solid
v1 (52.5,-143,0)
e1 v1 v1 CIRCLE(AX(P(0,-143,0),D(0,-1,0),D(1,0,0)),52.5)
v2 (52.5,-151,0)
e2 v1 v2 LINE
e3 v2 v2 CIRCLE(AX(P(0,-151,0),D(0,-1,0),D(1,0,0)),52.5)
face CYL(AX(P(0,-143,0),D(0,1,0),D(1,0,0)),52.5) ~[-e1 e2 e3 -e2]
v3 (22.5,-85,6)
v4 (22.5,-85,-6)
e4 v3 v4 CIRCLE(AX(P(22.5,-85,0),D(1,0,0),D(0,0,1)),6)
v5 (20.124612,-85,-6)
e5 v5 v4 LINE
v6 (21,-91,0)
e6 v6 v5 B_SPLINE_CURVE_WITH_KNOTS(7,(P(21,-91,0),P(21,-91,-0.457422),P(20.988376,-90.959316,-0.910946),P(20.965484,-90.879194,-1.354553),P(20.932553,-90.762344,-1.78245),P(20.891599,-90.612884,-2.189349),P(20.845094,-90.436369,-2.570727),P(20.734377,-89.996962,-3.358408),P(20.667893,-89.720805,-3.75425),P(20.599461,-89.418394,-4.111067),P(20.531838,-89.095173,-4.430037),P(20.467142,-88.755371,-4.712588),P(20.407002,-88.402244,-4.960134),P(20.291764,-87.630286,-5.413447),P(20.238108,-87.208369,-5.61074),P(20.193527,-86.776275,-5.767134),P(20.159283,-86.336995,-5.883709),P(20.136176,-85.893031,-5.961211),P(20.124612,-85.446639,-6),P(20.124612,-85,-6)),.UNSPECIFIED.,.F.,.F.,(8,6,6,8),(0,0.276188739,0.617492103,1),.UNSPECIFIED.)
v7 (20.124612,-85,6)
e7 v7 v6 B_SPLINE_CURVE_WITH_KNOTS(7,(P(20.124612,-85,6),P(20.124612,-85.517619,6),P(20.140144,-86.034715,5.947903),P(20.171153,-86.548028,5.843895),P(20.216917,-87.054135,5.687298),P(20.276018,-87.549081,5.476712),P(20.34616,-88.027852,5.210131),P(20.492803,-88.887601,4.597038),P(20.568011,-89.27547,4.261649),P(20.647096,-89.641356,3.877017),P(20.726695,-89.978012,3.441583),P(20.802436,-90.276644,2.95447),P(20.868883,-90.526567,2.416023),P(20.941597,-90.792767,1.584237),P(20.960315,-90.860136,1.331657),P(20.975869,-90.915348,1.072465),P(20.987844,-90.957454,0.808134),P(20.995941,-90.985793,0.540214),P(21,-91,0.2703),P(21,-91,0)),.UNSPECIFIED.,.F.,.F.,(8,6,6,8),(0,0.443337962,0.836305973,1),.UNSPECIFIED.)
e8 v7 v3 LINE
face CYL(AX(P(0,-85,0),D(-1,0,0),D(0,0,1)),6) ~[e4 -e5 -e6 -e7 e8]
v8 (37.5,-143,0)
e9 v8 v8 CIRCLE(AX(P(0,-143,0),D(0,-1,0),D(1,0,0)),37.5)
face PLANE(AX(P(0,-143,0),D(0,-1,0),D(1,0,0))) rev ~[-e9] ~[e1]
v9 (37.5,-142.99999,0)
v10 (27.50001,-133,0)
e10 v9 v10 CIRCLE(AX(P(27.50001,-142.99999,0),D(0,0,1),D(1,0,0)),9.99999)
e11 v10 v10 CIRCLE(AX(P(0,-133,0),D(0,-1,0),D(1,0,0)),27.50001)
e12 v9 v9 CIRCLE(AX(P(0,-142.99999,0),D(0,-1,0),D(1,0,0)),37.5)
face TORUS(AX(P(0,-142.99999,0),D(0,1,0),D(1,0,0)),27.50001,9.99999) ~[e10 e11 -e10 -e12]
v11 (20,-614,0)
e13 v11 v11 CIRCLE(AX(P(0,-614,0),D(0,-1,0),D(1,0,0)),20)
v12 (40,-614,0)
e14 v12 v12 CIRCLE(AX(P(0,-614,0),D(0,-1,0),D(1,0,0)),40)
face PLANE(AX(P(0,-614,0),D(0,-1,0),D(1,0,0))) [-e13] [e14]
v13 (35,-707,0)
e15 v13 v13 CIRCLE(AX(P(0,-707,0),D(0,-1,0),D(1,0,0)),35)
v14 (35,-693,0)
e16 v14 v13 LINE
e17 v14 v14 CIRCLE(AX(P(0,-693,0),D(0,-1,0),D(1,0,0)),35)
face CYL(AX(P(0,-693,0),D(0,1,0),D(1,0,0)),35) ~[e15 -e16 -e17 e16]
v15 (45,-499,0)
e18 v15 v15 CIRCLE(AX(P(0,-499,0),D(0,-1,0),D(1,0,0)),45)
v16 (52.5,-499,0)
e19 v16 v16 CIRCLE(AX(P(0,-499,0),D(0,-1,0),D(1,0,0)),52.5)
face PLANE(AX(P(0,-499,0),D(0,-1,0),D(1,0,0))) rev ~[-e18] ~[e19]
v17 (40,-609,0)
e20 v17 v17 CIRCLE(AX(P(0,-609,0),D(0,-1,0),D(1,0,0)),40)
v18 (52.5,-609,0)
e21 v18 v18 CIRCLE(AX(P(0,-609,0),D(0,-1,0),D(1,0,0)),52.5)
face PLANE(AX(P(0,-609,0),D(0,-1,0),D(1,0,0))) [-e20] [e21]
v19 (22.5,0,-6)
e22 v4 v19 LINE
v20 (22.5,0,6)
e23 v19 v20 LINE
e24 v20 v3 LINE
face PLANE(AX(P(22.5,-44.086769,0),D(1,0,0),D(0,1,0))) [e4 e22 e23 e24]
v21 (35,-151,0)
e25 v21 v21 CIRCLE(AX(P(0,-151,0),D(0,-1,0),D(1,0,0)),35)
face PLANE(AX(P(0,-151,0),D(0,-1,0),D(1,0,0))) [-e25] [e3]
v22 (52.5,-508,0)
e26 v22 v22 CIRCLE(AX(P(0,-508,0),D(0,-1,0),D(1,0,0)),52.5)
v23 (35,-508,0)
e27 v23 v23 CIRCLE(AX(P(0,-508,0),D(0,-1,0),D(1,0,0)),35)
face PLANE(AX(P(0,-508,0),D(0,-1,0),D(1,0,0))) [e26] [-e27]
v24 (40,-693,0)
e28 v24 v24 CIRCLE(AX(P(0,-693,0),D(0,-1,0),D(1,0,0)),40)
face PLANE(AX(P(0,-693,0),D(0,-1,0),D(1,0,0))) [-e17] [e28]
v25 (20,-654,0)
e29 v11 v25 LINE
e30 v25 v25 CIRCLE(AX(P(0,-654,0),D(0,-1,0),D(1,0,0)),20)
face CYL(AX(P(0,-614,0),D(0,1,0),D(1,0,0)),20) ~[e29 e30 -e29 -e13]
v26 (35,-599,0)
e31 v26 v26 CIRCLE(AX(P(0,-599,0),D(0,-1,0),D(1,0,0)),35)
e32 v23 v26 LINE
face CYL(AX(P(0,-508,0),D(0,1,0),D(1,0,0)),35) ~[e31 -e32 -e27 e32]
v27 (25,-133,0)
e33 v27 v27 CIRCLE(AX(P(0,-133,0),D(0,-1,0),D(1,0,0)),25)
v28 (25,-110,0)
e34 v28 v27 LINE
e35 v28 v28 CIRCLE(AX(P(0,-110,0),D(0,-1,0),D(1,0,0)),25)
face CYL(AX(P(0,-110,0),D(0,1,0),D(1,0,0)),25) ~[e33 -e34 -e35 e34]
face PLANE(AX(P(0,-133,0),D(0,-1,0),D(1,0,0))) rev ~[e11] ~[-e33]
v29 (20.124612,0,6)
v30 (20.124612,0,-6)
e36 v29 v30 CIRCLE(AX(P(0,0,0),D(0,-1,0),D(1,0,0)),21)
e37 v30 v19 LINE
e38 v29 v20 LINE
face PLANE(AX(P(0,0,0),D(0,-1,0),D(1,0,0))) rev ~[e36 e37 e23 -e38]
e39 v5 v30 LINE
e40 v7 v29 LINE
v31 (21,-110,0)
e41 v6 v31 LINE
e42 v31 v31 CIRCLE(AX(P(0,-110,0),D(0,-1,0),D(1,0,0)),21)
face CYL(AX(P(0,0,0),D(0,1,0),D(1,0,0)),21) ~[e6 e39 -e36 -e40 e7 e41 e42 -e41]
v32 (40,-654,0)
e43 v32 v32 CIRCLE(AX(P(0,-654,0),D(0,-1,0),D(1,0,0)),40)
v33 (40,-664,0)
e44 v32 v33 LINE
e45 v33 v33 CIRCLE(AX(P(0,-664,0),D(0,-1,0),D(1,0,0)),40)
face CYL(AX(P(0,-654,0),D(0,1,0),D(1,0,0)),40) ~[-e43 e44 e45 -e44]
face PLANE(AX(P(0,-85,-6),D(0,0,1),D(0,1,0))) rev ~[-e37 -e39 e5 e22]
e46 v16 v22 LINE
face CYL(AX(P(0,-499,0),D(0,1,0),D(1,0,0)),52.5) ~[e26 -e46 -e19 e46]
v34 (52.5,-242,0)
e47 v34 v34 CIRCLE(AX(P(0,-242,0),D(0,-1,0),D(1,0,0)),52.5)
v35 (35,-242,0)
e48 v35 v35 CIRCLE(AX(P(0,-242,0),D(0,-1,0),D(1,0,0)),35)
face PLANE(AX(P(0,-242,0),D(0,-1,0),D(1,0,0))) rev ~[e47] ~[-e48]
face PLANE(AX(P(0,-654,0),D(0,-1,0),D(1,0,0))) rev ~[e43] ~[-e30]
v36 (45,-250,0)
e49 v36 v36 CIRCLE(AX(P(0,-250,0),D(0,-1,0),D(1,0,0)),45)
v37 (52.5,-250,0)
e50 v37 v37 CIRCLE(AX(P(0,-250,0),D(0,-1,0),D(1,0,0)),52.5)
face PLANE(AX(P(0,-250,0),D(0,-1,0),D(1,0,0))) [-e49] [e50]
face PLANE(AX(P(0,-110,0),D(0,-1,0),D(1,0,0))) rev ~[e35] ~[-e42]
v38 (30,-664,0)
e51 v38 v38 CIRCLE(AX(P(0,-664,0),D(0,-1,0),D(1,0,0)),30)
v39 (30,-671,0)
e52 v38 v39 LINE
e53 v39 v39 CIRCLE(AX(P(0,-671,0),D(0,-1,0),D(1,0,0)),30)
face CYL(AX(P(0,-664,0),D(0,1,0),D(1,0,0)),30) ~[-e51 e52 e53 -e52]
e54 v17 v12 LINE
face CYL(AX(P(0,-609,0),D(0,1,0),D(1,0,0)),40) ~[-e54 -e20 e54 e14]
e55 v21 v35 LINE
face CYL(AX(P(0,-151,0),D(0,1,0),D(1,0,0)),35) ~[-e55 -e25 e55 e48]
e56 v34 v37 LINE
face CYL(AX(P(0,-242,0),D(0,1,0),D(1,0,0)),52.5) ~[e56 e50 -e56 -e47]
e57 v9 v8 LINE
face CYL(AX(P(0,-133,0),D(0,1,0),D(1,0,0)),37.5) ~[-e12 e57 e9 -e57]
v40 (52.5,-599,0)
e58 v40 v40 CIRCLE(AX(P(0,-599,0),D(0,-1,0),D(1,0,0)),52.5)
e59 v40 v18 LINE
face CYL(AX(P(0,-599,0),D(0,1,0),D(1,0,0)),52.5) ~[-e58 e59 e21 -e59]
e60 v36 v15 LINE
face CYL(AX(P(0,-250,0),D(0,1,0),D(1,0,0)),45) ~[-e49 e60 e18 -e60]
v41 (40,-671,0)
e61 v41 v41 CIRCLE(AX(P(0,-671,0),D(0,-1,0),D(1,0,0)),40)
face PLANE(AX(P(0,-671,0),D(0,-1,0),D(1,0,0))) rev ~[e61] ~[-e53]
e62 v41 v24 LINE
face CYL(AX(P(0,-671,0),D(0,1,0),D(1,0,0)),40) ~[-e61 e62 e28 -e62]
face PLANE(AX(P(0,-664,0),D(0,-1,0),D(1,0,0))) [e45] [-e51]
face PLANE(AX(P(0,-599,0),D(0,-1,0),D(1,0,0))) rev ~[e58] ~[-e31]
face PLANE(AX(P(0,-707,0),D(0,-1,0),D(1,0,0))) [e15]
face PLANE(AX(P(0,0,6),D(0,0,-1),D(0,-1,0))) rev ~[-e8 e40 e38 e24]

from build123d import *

# Parameters (mm, degrees)
F0_R      = 21
F1_DEPTH  = 110
F3_DEPTH  = 22.5
F4_R      = 25
F5_DEPTH  = 23
F6_R      = 37.5
F7_DEPTH  = 10
F8_R      = 9.99999
F9_R      = 52.5
F9_R_2    = 37.5
F10_DEPTH = 8
F11_R     = 35
F12_DEPTH = 91
F13_R     = 52.5
F14_DEPTH = 8
F15_R     = 45
F16_DEPTH = 249
F17_R     = 52.5
F18_DEPTH = 9
F19_R     = 35
F20_DEPTH = 91
F21_R     = 52.5
F22_DEPTH = 10
F23_R     = 40
F24_DEPTH = 5
F25_R     = 20
F26_DEPTH = 40
F27_R     = 40
F28_DEPTH = 10
F29_R     = 30
F30_DEPTH = 7
F31_R     = 40
F32_DEPTH = 22
F33_R     = 35
F34_DEPTH = 14


# Not quite as in the source:
# - a fillet or chamfer is up to 0.001 mm smaller than in the source, because OpenCascade refuses the exact size


with BuildPart() as f1:
    # F0 (on Front) → F1 (new body)
    with BuildSketch(Plane.XZ):
        Circle(F0_R)
    extrude(amount=F1_DEPTH)

    # F2 (on Right) → F3 (join)
    with BuildSketch(Plane.YZ):
        with BuildLine():
            Line((0, -6), (0, 6))
            Line((0, 6), (-85, 6))
            ThreePointArc((-85, 6), (-91, 0), (-85, -6))
            Line((-85, -6), (0, -6))
        make_face()
    extrude(amount=F3_DEPTH)

    # F4 (on face) → F5 (join)
    with BuildSketch(Plane.XZ.offset(110)):
        Circle(F4_R)
    extrude(amount=F5_DEPTH)

    # F6 (on face) → F7 (join)
    with BuildSketch(Plane.XZ.offset(133)):
        Circle(F6_R)
    extrude(amount=F7_DEPTH)

    # F8 (radius 10 in the source; OpenCascade refuses exactly that, so slightly less here)
    f8_edges = [f1.edges().sort_by_distance(p)[0] for p in [
        (-37.5, -133, 0),
    ]]
    fillet(f8_edges, radius=F8_R)

    # F9 (on face) → F10 (join)
    with BuildSketch(Plane.XZ.offset(143)):
        Circle(F9_R)
        Circle(F9_R_2, mode=Mode.SUBTRACT)
        Circle(F9_R_2)
    extrude(amount=F10_DEPTH)

    # F11 (on face) → F12 (join)
    with BuildSketch(Plane.XZ.offset(151)):
        Circle(F11_R)
    extrude(amount=F12_DEPTH)

    # F13 (on face) → F14 (join)
    with BuildSketch(Plane.XZ.offset(242)):
        Circle(F13_R)
    extrude(amount=F14_DEPTH)

    # F15 (on face) → F16 (join)
    with BuildSketch(Plane.XZ.offset(250)):
        Circle(F15_R)
    extrude(amount=F16_DEPTH)

    # F17 (on face) → F18 (join)
    with BuildSketch(Plane.XZ.offset(499)):
        Circle(F17_R)
    extrude(amount=F18_DEPTH)

    # F19 (on face) → F20 (join)
    with BuildSketch(Plane.XZ.offset(508)):
        Circle(F19_R)
    extrude(amount=F20_DEPTH)

    # F21 (on face) → F22 (join)
    with BuildSketch(Plane.XZ.offset(599)):
        Circle(F21_R)
    extrude(amount=F22_DEPTH)

    # F23 (on face) → F24 (join)
    with BuildSketch(Plane.XZ.offset(609)):
        Circle(F23_R)
    extrude(amount=F24_DEPTH)

    # F25 (on face) → F26 (join)
    with BuildSketch(Plane.XZ.offset(614)):
        Circle(F25_R)
    extrude(amount=F26_DEPTH)

    # F27 (on face) → F28 (join)
    with BuildSketch(Plane.XZ.offset(654)):
        Circle(F27_R)
    extrude(amount=F28_DEPTH)

    # F29 (on face) → F30 (join)
    with BuildSketch(Plane.XZ.offset(664)):
        Circle(F29_R)
    extrude(amount=F30_DEPTH)

    # F31 (on face) → F32 (join)
    with BuildSketch(Plane.XZ.offset(671)):
        Circle(F31_R)
    extrude(amount=F32_DEPTH)

    # F33 (on face) → F34 (join)
    with BuildSketch(Plane.XZ.offset(693)):
        Circle(F33_R)
    extrude(amount=F34_DEPTH)


solid = f1.part
